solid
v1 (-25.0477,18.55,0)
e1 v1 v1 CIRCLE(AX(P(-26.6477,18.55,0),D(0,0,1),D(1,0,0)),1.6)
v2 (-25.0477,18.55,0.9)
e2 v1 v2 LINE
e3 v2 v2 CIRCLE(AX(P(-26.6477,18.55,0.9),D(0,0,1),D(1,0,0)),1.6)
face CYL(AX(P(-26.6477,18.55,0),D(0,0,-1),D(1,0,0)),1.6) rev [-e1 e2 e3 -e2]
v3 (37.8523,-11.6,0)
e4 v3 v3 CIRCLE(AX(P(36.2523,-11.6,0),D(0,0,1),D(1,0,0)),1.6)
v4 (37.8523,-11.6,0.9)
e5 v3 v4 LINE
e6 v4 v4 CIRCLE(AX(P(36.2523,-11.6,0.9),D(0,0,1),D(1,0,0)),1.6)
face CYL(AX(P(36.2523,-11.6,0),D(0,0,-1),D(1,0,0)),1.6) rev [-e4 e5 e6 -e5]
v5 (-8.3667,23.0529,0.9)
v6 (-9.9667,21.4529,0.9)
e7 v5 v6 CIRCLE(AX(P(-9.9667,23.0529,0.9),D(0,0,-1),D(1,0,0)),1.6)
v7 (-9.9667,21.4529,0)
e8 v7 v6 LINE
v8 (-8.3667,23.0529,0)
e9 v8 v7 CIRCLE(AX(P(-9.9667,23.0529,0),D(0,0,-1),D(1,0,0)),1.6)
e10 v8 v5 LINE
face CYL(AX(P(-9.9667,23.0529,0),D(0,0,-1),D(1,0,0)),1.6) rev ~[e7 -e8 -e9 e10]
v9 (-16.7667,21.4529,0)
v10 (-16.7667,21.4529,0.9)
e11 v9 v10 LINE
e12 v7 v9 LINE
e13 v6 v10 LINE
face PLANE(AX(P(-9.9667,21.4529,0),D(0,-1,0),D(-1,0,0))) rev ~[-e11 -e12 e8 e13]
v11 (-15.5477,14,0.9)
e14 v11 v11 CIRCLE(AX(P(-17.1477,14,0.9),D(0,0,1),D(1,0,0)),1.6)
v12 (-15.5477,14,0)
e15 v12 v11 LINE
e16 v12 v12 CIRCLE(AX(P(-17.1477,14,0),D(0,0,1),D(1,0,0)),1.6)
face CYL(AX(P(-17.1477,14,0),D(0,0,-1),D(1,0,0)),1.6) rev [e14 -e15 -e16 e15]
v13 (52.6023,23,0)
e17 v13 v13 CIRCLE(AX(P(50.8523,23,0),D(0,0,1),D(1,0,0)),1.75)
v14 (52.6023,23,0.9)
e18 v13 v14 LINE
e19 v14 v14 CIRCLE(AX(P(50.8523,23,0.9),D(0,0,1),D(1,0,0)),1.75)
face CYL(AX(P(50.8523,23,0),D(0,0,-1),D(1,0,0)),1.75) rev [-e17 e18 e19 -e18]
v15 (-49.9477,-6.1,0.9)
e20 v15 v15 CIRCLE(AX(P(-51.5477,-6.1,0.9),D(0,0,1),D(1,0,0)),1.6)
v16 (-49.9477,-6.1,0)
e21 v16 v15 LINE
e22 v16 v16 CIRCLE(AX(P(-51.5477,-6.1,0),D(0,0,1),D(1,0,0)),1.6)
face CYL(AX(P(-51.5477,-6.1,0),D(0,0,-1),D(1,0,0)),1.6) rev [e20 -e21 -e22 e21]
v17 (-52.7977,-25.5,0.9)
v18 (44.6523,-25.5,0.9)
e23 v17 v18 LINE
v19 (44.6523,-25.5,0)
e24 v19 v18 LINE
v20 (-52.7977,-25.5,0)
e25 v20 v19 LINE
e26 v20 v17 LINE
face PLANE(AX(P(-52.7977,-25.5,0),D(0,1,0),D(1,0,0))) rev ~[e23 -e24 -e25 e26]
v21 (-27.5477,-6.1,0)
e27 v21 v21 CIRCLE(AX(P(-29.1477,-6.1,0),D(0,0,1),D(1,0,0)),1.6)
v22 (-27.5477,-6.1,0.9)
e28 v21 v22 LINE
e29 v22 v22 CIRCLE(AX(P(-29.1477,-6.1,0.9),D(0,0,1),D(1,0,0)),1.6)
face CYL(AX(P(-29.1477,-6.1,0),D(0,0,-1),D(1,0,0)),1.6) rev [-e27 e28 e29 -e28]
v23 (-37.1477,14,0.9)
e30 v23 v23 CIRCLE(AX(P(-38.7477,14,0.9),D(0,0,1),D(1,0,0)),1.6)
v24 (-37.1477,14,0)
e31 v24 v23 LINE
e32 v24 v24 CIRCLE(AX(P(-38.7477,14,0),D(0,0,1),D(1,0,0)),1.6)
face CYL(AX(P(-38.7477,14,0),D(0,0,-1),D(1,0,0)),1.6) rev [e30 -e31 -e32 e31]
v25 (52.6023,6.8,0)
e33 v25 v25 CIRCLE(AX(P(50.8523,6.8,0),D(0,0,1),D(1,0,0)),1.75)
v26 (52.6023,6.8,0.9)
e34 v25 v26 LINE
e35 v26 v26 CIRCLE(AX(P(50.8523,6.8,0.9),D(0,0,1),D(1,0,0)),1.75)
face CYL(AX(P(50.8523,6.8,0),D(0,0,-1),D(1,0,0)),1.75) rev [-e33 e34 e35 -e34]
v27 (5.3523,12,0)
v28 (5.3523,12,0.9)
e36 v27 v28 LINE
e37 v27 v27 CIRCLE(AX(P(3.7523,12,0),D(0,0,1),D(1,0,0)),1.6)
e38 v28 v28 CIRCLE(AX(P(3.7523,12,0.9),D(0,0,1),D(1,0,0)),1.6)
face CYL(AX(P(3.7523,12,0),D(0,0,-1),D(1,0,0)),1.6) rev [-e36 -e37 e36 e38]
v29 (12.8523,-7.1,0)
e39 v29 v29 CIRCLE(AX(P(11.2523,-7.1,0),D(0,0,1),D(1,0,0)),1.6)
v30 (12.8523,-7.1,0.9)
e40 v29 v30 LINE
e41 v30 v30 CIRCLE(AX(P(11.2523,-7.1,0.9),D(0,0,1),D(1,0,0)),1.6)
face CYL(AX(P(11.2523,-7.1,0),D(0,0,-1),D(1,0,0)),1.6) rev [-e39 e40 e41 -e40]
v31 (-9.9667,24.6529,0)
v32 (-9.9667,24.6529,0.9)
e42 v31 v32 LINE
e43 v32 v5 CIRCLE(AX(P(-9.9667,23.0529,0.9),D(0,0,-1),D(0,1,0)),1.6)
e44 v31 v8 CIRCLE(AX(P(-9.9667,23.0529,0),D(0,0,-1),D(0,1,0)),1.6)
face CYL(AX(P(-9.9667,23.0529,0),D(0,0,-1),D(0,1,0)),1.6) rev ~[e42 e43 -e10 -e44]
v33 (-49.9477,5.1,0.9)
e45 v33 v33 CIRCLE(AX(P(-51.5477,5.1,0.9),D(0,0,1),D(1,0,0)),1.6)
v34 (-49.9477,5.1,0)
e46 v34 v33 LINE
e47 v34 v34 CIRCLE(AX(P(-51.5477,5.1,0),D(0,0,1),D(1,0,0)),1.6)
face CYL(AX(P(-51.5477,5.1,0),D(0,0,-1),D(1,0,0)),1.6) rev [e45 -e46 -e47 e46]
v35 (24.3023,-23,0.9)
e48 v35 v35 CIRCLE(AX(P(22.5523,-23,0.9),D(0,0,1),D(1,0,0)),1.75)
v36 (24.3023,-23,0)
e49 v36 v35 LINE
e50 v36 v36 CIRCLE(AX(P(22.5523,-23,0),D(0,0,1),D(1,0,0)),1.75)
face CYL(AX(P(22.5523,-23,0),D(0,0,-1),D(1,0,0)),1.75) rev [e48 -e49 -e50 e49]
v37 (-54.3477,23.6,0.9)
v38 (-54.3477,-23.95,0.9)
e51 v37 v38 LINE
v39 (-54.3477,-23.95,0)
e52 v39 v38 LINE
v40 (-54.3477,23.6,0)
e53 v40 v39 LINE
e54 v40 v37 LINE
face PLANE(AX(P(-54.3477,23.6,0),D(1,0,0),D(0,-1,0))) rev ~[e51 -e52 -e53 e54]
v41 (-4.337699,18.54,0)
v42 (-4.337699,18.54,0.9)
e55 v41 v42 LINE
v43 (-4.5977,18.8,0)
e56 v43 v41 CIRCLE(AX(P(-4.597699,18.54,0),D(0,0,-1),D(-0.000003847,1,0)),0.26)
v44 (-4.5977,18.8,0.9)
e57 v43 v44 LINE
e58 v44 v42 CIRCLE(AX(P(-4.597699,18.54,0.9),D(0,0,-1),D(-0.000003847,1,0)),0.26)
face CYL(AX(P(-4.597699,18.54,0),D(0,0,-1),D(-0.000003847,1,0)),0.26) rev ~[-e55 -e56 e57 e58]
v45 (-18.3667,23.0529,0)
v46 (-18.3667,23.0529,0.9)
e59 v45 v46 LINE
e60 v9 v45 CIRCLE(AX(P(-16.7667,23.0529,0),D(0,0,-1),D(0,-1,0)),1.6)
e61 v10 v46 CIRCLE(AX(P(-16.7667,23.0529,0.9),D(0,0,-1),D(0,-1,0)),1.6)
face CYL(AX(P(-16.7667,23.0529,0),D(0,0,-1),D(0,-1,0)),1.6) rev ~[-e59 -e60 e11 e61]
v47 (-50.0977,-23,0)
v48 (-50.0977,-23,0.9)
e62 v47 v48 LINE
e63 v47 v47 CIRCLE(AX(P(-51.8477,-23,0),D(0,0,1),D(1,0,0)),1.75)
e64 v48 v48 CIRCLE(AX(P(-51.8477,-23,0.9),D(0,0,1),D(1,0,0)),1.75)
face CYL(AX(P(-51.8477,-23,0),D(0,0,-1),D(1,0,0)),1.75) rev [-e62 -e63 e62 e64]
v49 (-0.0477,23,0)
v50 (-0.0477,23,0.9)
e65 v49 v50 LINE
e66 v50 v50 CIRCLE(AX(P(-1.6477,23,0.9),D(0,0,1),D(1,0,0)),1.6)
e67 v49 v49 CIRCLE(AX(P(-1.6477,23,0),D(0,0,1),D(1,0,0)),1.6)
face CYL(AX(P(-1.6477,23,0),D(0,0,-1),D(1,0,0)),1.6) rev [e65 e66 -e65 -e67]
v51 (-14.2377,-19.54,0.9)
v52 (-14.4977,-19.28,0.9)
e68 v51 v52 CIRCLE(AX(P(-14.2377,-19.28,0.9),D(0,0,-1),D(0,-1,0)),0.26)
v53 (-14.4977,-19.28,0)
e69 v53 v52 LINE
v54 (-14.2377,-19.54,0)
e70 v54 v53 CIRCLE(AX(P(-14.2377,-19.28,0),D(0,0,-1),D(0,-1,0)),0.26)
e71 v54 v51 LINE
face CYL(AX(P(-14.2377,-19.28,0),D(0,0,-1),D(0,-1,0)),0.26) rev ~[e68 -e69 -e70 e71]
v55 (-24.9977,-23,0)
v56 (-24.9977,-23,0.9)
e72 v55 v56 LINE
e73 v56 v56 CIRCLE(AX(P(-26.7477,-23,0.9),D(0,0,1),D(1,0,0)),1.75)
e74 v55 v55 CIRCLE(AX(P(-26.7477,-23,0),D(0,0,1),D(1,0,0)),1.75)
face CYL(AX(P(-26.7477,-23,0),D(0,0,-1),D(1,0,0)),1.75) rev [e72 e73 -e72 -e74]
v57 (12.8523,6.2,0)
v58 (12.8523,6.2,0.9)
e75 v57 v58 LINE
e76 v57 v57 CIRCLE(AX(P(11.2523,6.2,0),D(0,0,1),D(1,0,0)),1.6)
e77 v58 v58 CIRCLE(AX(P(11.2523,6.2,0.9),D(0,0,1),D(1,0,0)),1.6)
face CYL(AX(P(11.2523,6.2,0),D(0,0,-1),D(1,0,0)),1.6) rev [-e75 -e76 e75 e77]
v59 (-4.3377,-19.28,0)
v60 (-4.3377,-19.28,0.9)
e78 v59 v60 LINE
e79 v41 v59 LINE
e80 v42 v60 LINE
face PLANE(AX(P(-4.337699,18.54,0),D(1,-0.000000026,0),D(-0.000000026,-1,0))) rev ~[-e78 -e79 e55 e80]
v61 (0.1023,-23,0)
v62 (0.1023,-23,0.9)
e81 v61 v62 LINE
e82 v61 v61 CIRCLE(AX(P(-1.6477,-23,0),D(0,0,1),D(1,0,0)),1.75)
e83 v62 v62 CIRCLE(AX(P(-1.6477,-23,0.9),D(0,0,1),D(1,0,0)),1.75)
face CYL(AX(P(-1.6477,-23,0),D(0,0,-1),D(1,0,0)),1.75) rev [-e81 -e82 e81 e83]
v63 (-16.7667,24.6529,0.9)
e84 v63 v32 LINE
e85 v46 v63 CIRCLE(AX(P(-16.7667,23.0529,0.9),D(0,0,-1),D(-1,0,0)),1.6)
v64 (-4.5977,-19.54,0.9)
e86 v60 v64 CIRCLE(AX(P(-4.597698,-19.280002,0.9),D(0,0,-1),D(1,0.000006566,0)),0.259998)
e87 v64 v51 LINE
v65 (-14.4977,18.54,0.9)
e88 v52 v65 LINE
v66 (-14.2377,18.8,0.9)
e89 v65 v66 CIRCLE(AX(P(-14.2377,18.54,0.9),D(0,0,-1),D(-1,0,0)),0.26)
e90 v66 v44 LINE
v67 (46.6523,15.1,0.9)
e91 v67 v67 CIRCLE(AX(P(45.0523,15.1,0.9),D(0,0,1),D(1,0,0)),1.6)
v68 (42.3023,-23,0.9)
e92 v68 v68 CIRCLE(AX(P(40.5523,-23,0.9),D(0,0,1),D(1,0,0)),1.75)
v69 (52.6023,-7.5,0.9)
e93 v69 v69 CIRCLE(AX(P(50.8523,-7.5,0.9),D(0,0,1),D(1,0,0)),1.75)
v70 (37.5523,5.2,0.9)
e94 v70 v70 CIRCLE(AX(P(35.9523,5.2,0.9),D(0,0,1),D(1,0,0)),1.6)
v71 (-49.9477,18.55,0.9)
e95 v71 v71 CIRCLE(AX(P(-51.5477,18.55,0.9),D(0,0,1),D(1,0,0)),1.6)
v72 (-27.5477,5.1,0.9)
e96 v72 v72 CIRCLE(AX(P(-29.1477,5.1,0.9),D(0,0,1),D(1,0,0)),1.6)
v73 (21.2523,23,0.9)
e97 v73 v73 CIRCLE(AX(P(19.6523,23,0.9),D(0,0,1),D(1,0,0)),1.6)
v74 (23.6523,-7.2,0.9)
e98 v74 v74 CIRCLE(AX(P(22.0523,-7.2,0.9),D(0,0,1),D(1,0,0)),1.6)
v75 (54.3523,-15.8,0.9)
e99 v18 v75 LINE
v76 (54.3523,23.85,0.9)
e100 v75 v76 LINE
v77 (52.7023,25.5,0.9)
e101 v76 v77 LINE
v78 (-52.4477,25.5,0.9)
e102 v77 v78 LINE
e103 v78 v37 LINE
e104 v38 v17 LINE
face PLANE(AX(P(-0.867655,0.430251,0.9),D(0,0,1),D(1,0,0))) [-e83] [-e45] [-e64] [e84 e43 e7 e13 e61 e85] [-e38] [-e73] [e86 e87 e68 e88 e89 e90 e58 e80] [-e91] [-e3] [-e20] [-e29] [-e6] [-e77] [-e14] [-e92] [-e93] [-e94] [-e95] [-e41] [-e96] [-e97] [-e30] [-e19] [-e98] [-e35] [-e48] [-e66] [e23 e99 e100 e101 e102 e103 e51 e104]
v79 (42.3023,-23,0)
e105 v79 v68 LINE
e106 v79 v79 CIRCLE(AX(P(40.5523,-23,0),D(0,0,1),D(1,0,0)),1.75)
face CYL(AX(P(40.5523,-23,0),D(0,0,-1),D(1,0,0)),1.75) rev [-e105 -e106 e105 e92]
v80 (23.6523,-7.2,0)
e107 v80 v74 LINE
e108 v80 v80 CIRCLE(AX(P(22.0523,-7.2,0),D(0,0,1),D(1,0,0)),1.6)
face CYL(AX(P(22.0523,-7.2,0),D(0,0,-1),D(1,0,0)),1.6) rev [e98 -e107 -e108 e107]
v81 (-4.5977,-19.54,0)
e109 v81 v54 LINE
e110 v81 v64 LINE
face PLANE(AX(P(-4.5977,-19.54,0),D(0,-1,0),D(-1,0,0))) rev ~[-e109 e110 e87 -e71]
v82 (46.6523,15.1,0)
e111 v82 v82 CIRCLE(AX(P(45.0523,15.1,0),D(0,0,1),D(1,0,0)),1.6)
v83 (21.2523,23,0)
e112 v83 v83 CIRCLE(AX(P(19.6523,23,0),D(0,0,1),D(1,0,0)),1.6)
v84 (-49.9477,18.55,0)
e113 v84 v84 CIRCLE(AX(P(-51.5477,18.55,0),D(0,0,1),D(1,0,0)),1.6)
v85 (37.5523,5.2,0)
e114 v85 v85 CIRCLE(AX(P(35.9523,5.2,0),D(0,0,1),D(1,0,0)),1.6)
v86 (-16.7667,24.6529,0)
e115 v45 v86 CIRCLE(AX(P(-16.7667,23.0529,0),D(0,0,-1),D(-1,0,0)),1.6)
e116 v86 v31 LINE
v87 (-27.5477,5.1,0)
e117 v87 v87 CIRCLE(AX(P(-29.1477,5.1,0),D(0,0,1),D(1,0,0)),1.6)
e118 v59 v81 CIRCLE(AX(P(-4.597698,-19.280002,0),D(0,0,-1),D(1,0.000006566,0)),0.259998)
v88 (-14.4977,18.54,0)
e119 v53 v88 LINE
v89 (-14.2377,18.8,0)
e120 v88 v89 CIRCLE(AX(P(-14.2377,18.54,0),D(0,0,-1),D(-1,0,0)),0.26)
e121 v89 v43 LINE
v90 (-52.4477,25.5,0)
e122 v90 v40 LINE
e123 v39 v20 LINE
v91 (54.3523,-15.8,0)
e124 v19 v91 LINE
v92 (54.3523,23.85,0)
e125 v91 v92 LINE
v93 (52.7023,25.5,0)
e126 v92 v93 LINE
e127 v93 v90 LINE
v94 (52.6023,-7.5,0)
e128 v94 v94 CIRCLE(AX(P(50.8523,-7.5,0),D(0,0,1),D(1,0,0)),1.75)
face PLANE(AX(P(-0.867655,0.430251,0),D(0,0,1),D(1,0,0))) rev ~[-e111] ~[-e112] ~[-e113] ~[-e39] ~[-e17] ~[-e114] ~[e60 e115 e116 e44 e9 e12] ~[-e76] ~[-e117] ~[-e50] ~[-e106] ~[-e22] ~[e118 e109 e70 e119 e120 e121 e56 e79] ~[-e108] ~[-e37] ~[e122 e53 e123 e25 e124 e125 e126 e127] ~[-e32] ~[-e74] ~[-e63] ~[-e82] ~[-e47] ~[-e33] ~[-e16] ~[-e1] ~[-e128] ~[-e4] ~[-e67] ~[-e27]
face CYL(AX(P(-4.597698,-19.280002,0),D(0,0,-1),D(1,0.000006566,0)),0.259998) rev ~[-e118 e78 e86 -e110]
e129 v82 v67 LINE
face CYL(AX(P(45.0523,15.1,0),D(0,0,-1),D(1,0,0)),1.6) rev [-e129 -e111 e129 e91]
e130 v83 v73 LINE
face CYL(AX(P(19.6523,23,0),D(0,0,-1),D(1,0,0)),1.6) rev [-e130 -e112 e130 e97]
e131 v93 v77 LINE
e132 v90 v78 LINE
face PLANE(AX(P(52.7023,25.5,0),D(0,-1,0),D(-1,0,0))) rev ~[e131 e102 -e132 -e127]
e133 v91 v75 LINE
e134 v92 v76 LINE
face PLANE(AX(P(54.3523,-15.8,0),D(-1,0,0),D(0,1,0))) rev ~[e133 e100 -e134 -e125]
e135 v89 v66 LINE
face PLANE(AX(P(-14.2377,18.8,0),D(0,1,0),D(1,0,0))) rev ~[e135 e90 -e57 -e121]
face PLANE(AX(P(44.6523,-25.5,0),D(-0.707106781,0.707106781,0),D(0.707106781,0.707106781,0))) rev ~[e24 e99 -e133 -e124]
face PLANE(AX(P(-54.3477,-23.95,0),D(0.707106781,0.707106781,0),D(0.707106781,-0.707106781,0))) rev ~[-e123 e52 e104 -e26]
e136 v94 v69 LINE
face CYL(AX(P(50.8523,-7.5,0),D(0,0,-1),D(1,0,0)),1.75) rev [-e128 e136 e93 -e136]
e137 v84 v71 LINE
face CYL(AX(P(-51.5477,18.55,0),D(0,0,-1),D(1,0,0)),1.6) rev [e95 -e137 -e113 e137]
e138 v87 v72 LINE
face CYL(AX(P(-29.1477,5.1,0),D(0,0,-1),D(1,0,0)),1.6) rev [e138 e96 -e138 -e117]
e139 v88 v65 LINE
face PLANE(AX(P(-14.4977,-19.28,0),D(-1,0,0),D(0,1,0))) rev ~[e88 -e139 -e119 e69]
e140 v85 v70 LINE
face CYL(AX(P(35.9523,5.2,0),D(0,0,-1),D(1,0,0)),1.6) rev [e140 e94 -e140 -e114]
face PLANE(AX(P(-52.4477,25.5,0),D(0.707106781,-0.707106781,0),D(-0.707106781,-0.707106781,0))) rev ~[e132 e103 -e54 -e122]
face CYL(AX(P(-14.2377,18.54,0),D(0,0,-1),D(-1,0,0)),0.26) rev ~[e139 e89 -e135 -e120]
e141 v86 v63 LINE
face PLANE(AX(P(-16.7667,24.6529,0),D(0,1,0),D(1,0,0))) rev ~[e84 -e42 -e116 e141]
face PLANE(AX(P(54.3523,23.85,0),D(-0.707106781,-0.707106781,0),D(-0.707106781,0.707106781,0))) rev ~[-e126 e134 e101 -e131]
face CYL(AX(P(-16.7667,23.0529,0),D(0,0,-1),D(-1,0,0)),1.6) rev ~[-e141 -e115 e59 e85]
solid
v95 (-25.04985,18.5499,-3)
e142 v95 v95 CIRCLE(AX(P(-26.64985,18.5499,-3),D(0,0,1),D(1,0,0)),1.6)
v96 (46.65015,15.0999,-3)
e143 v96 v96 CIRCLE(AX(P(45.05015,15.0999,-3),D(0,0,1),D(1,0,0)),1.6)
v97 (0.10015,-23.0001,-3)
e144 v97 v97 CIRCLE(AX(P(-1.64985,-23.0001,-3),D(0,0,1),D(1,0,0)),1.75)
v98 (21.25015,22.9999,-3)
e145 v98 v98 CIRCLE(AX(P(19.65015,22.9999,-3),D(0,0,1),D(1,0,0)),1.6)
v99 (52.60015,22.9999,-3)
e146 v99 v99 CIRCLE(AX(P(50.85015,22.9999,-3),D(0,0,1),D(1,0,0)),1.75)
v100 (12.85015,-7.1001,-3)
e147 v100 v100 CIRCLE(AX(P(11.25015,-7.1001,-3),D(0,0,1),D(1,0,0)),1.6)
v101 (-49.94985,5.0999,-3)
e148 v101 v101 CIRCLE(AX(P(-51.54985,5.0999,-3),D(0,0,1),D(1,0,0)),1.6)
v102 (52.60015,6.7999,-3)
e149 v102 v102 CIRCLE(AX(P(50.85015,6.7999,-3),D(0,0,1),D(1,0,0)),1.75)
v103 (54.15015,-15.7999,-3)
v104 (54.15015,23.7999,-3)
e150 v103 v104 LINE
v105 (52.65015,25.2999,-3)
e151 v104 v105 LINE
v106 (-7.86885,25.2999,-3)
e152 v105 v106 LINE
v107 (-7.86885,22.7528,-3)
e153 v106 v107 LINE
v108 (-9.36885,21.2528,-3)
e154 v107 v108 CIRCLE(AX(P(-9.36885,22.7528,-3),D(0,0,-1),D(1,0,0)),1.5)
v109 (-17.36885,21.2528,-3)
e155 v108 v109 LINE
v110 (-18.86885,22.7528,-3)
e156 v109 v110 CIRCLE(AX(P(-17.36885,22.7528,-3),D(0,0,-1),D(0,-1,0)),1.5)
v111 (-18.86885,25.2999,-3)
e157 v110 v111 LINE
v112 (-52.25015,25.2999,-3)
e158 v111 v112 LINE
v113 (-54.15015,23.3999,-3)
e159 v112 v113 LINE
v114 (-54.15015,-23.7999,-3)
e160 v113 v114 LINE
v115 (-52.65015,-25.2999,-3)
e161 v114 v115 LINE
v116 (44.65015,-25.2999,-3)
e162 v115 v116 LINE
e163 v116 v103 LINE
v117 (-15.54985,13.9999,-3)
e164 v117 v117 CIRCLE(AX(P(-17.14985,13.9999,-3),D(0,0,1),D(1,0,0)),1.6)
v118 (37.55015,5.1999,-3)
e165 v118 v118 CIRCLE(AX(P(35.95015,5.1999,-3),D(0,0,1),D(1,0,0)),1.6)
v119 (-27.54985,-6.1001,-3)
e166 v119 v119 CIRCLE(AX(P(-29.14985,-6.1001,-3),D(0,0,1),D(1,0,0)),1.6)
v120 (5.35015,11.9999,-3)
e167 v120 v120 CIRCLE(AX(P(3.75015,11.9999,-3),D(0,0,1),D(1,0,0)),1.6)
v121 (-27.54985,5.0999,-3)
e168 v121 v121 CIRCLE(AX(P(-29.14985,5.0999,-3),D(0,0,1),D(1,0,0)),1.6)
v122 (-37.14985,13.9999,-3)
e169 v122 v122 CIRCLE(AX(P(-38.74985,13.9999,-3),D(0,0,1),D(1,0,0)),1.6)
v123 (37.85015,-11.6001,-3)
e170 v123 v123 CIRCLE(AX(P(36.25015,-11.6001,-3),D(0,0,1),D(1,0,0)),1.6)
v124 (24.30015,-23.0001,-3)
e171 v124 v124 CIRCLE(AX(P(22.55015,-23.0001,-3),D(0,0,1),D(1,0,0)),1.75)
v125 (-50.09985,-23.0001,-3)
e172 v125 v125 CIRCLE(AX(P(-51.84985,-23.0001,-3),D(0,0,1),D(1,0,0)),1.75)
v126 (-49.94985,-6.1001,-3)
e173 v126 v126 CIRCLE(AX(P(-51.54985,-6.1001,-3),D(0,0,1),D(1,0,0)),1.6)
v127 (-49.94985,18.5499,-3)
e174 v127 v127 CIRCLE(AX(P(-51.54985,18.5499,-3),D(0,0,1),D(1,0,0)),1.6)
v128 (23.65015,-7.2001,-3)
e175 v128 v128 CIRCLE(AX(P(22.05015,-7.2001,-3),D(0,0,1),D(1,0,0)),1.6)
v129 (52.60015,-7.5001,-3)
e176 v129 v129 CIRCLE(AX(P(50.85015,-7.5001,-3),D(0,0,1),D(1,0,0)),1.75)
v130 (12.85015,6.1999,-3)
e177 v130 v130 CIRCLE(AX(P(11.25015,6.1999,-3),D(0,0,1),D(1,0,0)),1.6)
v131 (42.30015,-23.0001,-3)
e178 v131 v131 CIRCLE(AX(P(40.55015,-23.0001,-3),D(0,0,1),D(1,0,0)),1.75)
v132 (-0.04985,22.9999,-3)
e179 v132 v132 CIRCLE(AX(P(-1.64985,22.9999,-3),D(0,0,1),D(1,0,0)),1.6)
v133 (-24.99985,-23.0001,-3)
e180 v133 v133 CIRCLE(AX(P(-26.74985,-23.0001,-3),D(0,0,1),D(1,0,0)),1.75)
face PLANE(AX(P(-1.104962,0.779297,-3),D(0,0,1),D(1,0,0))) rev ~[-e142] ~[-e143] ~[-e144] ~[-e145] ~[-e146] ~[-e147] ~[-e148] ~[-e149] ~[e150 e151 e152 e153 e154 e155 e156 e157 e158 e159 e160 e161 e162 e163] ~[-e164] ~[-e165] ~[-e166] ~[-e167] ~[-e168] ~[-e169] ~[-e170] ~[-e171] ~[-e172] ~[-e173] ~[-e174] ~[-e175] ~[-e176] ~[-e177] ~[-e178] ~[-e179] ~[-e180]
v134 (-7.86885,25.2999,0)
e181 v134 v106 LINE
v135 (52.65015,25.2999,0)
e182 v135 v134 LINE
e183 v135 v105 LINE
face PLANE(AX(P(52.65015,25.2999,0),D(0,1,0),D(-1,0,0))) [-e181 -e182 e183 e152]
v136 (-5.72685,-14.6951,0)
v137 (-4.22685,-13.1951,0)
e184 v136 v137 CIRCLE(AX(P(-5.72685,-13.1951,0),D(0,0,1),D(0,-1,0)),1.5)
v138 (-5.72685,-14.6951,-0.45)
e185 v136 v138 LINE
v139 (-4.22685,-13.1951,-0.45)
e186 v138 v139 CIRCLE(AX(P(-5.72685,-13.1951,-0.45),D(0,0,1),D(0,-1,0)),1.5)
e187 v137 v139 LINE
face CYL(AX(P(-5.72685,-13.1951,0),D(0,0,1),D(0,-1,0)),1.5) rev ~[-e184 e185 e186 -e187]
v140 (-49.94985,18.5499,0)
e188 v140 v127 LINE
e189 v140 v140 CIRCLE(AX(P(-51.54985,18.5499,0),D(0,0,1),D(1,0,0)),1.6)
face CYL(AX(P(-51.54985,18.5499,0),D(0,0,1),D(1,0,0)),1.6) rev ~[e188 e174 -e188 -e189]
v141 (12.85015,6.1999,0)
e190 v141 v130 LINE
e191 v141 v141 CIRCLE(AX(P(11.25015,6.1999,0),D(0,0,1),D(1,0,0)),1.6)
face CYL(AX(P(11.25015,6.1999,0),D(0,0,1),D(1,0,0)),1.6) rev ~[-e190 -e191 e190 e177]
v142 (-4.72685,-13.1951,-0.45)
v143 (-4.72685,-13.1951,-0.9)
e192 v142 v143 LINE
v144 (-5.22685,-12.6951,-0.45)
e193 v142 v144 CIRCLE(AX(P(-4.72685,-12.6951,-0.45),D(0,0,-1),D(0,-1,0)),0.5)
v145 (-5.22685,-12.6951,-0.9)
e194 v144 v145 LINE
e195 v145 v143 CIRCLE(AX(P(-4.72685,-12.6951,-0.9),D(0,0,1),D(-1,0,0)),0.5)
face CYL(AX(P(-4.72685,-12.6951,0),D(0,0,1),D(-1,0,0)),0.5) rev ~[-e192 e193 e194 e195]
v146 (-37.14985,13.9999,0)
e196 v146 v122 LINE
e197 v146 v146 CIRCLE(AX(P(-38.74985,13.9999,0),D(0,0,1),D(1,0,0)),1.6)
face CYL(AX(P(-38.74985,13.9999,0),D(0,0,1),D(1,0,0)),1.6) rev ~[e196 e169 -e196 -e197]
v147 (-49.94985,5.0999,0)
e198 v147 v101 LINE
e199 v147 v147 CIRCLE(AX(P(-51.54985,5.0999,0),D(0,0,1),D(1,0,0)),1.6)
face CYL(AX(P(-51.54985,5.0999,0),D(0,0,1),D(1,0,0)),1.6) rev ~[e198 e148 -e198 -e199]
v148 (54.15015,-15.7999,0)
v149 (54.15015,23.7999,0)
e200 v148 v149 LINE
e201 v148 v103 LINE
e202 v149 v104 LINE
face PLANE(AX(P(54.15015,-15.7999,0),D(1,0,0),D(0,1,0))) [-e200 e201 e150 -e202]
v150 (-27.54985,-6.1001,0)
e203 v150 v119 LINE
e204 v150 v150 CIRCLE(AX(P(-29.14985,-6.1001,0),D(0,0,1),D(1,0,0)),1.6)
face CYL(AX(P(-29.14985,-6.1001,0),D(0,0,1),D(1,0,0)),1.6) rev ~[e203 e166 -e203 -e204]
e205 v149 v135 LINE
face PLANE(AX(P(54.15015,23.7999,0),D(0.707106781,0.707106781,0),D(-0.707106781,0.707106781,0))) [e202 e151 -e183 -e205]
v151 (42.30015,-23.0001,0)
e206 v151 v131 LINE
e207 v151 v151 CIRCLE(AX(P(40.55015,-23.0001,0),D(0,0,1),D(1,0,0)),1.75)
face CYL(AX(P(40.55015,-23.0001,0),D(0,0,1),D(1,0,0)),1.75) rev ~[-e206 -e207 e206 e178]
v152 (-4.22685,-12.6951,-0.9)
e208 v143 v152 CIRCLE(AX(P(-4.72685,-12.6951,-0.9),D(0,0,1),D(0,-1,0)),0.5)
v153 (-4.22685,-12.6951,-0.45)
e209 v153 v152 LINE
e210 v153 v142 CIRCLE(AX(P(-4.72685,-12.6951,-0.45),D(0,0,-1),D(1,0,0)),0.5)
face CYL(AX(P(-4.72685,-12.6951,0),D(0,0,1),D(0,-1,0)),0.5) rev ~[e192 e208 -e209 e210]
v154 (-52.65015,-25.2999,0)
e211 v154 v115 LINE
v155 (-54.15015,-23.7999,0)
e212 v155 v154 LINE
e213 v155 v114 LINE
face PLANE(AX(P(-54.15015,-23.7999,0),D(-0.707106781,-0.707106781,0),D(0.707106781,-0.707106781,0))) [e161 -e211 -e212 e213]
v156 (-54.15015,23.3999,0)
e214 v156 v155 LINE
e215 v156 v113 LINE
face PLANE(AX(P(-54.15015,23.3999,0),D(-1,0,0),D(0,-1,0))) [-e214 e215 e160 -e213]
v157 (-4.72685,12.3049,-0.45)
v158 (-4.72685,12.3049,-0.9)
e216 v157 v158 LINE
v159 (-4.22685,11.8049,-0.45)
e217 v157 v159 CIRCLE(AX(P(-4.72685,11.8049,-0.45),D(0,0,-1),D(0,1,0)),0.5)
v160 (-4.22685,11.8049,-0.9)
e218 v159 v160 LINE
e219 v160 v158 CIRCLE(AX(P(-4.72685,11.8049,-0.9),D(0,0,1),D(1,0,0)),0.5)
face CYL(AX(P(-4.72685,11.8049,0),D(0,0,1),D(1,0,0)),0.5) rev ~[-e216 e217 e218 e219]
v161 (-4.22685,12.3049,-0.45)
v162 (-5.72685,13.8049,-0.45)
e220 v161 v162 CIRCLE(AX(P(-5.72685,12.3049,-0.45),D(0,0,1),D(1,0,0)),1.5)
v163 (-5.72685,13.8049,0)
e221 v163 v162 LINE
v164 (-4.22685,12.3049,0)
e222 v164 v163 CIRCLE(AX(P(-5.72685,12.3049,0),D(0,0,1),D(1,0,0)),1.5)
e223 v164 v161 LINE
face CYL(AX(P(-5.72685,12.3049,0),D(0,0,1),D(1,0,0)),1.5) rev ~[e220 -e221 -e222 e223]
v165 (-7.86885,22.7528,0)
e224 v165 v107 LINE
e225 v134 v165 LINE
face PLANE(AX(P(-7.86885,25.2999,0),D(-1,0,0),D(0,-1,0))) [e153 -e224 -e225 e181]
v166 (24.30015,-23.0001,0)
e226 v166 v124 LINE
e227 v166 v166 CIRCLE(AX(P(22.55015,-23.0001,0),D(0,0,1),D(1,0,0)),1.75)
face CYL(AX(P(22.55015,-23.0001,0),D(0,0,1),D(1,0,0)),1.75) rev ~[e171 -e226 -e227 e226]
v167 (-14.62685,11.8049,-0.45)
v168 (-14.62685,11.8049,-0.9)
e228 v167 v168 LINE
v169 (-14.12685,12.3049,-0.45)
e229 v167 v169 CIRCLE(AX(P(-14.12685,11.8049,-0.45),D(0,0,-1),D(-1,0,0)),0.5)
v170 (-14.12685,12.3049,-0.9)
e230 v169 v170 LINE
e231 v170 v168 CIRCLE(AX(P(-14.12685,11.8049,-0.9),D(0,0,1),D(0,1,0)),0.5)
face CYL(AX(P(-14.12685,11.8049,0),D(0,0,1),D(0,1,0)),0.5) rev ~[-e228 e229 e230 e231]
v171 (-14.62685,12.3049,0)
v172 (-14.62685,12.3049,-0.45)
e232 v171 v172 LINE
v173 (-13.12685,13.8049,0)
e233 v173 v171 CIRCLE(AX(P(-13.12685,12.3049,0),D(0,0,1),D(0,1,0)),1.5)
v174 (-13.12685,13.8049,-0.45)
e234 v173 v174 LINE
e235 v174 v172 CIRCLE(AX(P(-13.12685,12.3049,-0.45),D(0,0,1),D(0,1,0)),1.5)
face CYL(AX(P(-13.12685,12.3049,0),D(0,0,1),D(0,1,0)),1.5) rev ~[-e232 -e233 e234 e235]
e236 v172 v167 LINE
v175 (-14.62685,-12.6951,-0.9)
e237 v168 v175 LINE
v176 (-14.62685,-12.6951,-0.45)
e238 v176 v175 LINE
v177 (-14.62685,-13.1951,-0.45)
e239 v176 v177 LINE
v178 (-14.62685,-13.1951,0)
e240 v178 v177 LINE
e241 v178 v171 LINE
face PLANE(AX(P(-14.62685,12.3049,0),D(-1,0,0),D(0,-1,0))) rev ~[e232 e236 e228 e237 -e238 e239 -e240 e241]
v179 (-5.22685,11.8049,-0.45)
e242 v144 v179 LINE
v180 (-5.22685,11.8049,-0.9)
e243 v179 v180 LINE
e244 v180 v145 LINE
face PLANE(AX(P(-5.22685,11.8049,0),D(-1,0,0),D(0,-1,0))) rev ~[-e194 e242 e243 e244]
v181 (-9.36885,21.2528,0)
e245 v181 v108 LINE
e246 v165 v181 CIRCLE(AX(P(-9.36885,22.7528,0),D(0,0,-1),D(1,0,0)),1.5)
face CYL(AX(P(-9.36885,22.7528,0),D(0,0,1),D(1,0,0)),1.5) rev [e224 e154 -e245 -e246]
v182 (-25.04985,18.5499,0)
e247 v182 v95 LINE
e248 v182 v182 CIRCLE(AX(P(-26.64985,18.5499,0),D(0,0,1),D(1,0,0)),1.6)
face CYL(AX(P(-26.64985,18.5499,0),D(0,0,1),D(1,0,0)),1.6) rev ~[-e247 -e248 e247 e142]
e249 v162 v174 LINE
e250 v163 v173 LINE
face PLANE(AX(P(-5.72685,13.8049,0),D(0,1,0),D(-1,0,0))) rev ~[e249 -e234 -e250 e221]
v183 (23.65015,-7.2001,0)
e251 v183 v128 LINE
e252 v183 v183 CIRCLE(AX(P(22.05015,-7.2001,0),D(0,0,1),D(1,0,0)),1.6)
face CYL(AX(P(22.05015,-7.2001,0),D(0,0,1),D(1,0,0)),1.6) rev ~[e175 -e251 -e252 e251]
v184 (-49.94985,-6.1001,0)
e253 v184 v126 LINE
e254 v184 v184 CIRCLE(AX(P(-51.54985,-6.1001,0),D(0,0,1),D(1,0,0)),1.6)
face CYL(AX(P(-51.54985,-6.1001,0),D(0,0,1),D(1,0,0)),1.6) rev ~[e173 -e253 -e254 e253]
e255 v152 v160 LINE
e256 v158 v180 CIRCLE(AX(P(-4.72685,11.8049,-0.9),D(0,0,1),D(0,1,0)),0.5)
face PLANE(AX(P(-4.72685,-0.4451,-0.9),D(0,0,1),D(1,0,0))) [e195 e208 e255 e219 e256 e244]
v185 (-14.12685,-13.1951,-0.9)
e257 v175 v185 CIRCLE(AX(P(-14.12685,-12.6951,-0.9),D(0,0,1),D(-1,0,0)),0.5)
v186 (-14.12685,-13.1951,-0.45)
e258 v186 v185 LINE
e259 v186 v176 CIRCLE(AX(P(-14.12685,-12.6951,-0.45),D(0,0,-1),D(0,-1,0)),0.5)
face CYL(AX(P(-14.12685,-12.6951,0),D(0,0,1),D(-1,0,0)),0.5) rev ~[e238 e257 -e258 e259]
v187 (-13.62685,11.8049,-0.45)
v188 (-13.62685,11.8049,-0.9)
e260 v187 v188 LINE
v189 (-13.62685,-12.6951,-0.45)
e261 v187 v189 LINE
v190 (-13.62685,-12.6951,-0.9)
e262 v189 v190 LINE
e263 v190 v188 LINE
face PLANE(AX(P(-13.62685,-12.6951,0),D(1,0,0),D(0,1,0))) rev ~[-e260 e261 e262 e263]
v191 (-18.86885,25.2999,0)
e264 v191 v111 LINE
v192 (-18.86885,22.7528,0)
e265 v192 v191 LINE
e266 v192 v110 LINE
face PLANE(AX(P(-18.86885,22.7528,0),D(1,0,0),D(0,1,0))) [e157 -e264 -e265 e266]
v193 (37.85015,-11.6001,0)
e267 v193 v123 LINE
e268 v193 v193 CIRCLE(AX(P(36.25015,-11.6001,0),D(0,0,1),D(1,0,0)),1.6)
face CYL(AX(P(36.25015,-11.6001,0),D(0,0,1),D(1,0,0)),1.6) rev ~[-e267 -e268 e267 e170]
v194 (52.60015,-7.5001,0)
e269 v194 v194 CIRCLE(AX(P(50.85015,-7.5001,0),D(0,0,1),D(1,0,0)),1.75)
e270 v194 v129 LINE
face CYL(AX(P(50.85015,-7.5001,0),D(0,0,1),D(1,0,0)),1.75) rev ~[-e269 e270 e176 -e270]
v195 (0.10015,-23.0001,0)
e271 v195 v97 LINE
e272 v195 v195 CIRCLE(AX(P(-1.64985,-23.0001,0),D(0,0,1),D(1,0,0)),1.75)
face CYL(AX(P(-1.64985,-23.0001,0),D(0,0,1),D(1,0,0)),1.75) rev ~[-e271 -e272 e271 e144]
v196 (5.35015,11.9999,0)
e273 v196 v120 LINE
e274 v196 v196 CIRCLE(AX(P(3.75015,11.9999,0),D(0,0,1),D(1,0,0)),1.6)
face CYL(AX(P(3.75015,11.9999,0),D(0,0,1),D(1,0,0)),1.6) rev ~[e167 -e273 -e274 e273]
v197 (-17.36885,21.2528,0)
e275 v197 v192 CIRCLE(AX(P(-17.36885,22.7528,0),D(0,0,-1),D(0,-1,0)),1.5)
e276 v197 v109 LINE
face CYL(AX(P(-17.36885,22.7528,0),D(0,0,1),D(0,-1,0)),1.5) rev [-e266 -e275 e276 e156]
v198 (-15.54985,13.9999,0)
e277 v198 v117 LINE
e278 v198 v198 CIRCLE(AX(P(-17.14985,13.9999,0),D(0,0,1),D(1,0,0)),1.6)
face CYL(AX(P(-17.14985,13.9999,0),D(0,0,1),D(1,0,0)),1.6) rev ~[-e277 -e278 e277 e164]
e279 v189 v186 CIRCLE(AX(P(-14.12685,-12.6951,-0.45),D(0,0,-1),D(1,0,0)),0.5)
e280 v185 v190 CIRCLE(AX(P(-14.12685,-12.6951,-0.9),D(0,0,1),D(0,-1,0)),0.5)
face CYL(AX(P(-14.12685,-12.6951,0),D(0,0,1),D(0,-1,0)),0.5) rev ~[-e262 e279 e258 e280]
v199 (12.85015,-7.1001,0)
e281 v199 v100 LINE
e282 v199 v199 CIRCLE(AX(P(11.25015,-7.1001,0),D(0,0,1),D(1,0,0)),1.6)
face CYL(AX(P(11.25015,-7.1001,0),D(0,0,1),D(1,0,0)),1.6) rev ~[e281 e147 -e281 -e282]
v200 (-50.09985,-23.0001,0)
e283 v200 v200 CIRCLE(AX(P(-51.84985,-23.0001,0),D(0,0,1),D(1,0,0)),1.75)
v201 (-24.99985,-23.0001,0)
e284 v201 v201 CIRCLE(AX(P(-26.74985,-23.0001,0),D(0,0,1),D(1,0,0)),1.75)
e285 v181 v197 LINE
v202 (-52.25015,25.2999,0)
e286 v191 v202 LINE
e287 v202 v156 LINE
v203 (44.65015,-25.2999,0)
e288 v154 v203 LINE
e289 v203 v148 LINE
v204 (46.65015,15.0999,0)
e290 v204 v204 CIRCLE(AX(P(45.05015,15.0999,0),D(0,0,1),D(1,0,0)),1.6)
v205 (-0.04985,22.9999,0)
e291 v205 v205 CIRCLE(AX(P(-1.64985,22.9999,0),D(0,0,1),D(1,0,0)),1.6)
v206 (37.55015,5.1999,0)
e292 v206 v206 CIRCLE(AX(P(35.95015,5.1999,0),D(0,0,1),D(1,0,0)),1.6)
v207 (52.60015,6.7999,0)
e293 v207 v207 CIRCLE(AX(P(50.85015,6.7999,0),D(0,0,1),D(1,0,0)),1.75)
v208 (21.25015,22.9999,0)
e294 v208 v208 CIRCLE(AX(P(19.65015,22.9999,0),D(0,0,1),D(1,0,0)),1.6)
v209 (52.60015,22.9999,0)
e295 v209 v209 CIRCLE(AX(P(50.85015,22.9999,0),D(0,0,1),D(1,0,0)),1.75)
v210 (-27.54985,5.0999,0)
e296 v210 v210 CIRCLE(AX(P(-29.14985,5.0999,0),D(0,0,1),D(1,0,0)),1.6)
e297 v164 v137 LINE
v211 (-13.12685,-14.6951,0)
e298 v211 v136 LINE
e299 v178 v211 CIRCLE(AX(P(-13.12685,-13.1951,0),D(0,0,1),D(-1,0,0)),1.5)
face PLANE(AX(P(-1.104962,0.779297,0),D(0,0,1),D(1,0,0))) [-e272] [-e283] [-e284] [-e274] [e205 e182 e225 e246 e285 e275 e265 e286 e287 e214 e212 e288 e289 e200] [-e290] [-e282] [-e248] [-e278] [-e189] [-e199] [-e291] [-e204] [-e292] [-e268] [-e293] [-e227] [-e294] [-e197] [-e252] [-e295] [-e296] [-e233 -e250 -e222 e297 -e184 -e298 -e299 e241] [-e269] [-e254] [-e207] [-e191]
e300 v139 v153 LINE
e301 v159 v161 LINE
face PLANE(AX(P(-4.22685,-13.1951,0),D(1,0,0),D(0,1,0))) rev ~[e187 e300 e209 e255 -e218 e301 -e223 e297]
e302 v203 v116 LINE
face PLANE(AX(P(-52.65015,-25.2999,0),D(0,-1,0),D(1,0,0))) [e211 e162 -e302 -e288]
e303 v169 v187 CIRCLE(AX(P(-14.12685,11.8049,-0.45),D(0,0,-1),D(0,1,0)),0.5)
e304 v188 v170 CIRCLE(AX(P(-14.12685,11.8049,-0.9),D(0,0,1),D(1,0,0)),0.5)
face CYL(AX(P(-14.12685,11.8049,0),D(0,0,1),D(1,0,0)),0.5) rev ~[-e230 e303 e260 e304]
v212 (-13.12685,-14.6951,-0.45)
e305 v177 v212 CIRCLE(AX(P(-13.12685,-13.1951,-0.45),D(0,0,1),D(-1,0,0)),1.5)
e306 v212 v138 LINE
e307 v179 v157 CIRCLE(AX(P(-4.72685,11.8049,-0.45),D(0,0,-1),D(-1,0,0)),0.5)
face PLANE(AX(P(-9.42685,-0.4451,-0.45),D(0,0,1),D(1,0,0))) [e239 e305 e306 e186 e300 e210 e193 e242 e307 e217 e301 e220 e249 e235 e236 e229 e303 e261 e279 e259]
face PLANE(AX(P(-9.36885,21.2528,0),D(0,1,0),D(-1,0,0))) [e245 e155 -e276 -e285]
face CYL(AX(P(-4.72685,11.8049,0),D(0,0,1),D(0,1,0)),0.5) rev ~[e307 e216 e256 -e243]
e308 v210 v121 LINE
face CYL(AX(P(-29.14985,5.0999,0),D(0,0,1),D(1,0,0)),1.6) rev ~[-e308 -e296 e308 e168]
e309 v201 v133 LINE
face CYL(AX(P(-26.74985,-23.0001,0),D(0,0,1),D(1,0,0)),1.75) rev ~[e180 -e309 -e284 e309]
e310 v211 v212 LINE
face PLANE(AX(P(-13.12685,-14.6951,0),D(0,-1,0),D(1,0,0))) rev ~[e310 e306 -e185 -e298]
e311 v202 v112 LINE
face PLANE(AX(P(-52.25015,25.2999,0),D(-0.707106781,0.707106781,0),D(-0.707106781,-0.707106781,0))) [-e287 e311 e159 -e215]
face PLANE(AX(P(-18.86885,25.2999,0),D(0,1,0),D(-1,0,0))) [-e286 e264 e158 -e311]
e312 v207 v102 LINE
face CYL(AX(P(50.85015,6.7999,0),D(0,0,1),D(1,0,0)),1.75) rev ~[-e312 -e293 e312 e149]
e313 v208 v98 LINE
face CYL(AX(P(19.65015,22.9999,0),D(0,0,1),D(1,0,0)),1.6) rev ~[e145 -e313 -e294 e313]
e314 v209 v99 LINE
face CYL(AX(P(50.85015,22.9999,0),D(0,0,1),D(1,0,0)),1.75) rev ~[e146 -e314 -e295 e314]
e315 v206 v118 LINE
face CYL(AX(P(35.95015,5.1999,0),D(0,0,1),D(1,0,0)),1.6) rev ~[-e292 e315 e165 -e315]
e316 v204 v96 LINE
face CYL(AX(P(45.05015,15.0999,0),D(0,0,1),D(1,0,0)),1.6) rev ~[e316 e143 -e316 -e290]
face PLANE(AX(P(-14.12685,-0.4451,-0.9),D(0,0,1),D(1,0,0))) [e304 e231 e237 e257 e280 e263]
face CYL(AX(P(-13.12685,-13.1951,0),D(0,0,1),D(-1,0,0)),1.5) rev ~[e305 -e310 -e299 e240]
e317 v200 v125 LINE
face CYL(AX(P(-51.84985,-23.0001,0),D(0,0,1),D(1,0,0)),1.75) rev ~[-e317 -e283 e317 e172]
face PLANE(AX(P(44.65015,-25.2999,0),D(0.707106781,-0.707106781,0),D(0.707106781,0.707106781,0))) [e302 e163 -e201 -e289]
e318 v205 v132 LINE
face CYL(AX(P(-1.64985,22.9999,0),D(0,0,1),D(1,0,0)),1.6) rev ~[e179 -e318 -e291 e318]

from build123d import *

# Parameters (mm, degrees)
F0_R     = 1.75
F0_R_2   = 1.6
F0_W     = 33.35
F0_H     = 3.8
F1_DEPTH = 0.9
F2_R     = 1.75
F2_R_2   = 1.6
F3_DEPTH = 3
F4_DEPTH = 0.45
F5_DEPTH = 0.9


# Not quite as in the source:
# - after a boolean that leaves OpenCascade's solid faulty, fix() repairs it
# - ends of sketch curves that miss each other by under 0.0002 mm in the source are joined


with BuildPart() as f1:
    # F0 (on Top) → F1 (new body)
    with BuildSketch(Plane.XY):
        Polygon((-54.3477, 23.6), (-54.3477, -23.95), (-52.7977, -25.5), (44.6523, -25.5), (54.3523, -15.8), (54.3523, 23.85), (52.7023, 25.5), (-52.4477, 25.5), align=None)
        with Locations((-51.8477, -23)):
            Circle(F0_R, mode=Mode.SUBTRACT)
        with Locations((-26.7477, -23)):
            Circle(F0_R, mode=Mode.SUBTRACT)
        with Locations((-1.6477, -23)):
            Circle(F0_R, mode=Mode.SUBTRACT)
        with Locations((-51.5477, -6.1)):
            Circle(F0_R_2, mode=Mode.SUBTRACT)
        with Locations((-29.1477, -6.1)):
            Circle(F0_R_2, mode=Mode.SUBTRACT)
        with BuildLine():
            Line((-14.4977, -19.28), (-14.4977, 18.54))
            ThreePointArc((-14.4977, 18.54), (-14.4215477631, 18.7238477631), (-14.2377, 18.8))
            Line((-14.2377, 18.8), (-4.5977, 18.8))
            ThreePointArc((-4.5977, 18.8), (-4.4138515904, 18.7238481167), (-4.337699, 18.54))
            Line((-4.337699, 18.54), (-4.3377, -19.28))
            ThreePointArc((-4.3377, -19.28), (-4.4138515904, -19.4638481167), (-4.5977, -19.54))
            Line((-4.5977, -19.54), (-14.2377, -19.54))
            ThreePointArc((-14.2377, -19.54), (-14.4215477631, -19.4638477631), (-14.4977, -19.28))
        make_face(mode=Mode.SUBTRACT)
        with Locations((22.5523, -23)):
            Circle(F0_R, mode=Mode.SUBTRACT)
        with Locations((40.5523, -23)):
            Circle(F0_R, mode=Mode.SUBTRACT)
        with Locations((11.2523, -7.1)):
            Circle(F0_R_2, mode=Mode.SUBTRACT)
        with Locations((22.0523, -7.2)):
            Circle(F0_R_2, mode=Mode.SUBTRACT)
        with Locations((36.2523, -11.6)):
            Circle(F0_R_2, mode=Mode.SUBTRACT)
        with Locations((50.8523, -7.5)):
            Circle(F0_R, mode=Mode.SUBTRACT)
        with Locations((-51.5477, 5.1)):
            Circle(F0_R_2, mode=Mode.SUBTRACT)
        with Locations((-29.1477, 5.1)):
            Circle(F0_R_2, mode=Mode.SUBTRACT)
        with Locations((-51.5477, 18.55)):
            Circle(F0_R_2, mode=Mode.SUBTRACT)
        with Locations((-38.7477, 14)):
            Circle(F0_R_2, mode=Mode.SUBTRACT)
        with Locations((-36.035871, 22.938344)):
            Rectangle(F0_W, F0_H, mode=Mode.SUBTRACT)
        with Locations((-17.1477, 14)):
            Circle(F0_R_2, mode=Mode.SUBTRACT)
        with Locations((-26.6477, 18.55)):
            Circle(F0_R_2, mode=Mode.SUBTRACT)
        with BuildLine():
            ThreePointArc((-16.7667, 21.4529), (-17.8980708499, 21.9215291501), (-18.3667, 23.0529))
            ThreePointArc((-18.3667, 23.0529), (-17.8980708499, 24.1842708499), (-16.7667, 24.6529))
            Line((-16.7667, 24.6529), (-9.9667, 24.6529))
            ThreePointArc((-9.9667, 24.6529), (-8.8353291501, 24.1842708499), (-8.3667, 23.0529))
            ThreePointArc((-8.3667, 23.0529), (-8.8353291501, 21.9215291501), (-9.9667, 21.4529))
            Line((-9.9667, 21.4529), (-16.7667, 21.4529))
        make_face(mode=Mode.SUBTRACT)
        with Locations((-1.6477, 23)):
            Circle(F0_R_2, mode=Mode.SUBTRACT)
        with Locations((11.2523, 6.2)):
            Circle(F0_R_2, mode=Mode.SUBTRACT)
        with Locations((3.7523, 12)):
            Circle(F0_R_2, mode=Mode.SUBTRACT)
        with Locations((35.9523, 5.2)):
            Circle(F0_R_2, mode=Mode.SUBTRACT)
        with Locations((50.8523, 6.8)):
            Circle(F0_R, mode=Mode.SUBTRACT)
        with Locations((19.6523, 23)):
            Circle(F0_R_2, mode=Mode.SUBTRACT)
        with Locations((45.0523, 15.1)):
            Circle(F0_R_2, mode=Mode.SUBTRACT)
        with Locations((50.8523, 23)):
            Circle(F0_R, mode=Mode.SUBTRACT)
        with Locations((-36.035871, 22.938344)):
            Rectangle(F0_W, F0_H)
    extrude(amount=F1_DEPTH)


with BuildPart() as f3:
    # F2 (on Top) → F3 (new body)
    with BuildSketch(Plane.XY):
        with BuildLine():
            ThreePointArc((-17.36885, 21.2528), (-18.4295101718, 21.6921398282), (-18.86885, 22.7528))
            Line((-18.86885, 22.7528), (-18.86885, 25.2999))
            Line((-18.86885, 25.2999), (-52.25015, 25.2999))
            Line((-52.25015, 25.2999), (-54.15015, 23.3999))
            Line((-54.15015, 23.3999), (-54.15015, -23.7999))
            Line((-54.15015, -23.7999), (-52.65015, -25.2999))
            Line((-52.65015, -25.2999), (44.65015, -25.2999))
            Line((44.65015, -25.2999), (54.15015, -15.7999))
            Line((54.15015, -15.7999), (54.15015, 23.7999))
            Line((54.15015, 23.7999), (52.65015, 25.2999))
            Line((52.65015, 25.2999), (-7.86885, 25.2999))
            Line((-7.86885, 25.2999), (-7.86885, 22.7528))
            ThreePointArc((-7.86885, 22.7528), (-8.3081898282, 21.6921398282), (-9.36885, 21.2528))
            Line((-9.36885, 21.2528), (-17.36885, 21.2528))
        make_face()
        with Locations((-51.84985, -23.0001)):
            Circle(F2_R, mode=Mode.SUBTRACT)
        with Locations((-26.74985, -23.0001)):
            Circle(F2_R, mode=Mode.SUBTRACT)
        with Locations((-1.64985, -23.0001)):
            Circle(F2_R, mode=Mode.SUBTRACT)
        with Locations((-51.54985, -6.1001)):
            Circle(F2_R_2, mode=Mode.SUBTRACT)
        with Locations((-29.14985, -6.1001)):
            Circle(F2_R_2, mode=Mode.SUBTRACT)
        with BuildLine():
            Line((-14.62685, 11.8049), (-14.62685, 12.3049))
            ThreePointArc((-14.62685, 12.3049), (-14.1875101718, 13.3655601718), (-13.12685, 13.8049))
            Line((-13.12685, 13.8049), (-5.72685, 13.8049))
            ThreePointArc((-5.72685, 13.8049), (-4.6661898282, 13.3655601718), (-4.22685, 12.3049))
            Line((-4.22685, 12.3049), (-4.22685, 11.8049))
            Line((-4.22685, 11.8049), (-4.22685, -12.6951))
            Line((-4.22685, -12.6951), (-4.22685, -13.1951))
            ThreePointArc((-4.22685, -13.1951), (-4.6661898282, -14.2557601718), (-5.72685, -14.6951))
            Line((-5.72685, -14.6951), (-13.12685, -14.6951))
            ThreePointArc((-13.12685, -14.6951), (-14.1875101718, -14.2557601718), (-14.62685, -13.1951))
            Line((-14.62685, -13.1951), (-14.62685, -12.6951))
            Line((-14.62685, -12.6951), (-14.62685, 11.8049))
        make_face(mode=Mode.SUBTRACT)
        with Locations((22.55015, -23.0001)):
            Circle(F2_R, mode=Mode.SUBTRACT)
        with Locations((40.55015, -23.0001)):
            Circle(F2_R, mode=Mode.SUBTRACT)
        with Locations((11.25015, -7.1001)):
            Circle(F2_R_2, mode=Mode.SUBTRACT)
        with Locations((22.05015, -7.2001)):
            Circle(F2_R_2, mode=Mode.SUBTRACT)
        with Locations((36.25015, -11.6001)):
            Circle(F2_R_2, mode=Mode.SUBTRACT)
        with Locations((50.85015, -7.5001)):
            Circle(F2_R, mode=Mode.SUBTRACT)
        with Locations((-51.54985, 5.0999)):
            Circle(F2_R_2, mode=Mode.SUBTRACT)
        with Locations((-29.14985, 5.0999)):
            Circle(F2_R_2, mode=Mode.SUBTRACT)
        with Locations((-51.54985, 18.5499)):
            Circle(F2_R_2, mode=Mode.SUBTRACT)
        with Locations((-38.74985, 13.9999)):
            Circle(F2_R_2, mode=Mode.SUBTRACT)
        with Locations((-17.14985, 13.9999)):
            Circle(F2_R_2, mode=Mode.SUBTRACT)
        with Locations((-26.64985, 18.5499)):
            Circle(F2_R_2, mode=Mode.SUBTRACT)
        with Locations((-1.64985, 22.9999)):
            Circle(F2_R_2, mode=Mode.SUBTRACT)
        with Locations((11.25015, 6.1999)):
            Circle(F2_R_2, mode=Mode.SUBTRACT)
        with Locations((3.75015, 11.9999)):
            Circle(F2_R_2, mode=Mode.SUBTRACT)
        with Locations((35.95015, 5.1999)):
            Circle(F2_R_2, mode=Mode.SUBTRACT)
        with Locations((50.85015, 6.7999)):
            Circle(F2_R, mode=Mode.SUBTRACT)
        with Locations((19.65015, 22.9999)):
            Circle(F2_R_2, mode=Mode.SUBTRACT)
        with Locations((45.05015, 15.0999)):
            Circle(F2_R_2, mode=Mode.SUBTRACT)
        with Locations((50.85015, 22.9999)):
            Circle(F2_R, mode=Mode.SUBTRACT)
        with BuildLine():
            ThreePointArc((-13.12685, 13.8049), (-14.1875101718, 13.3655601718), (-14.62685, 12.3049))
            Line((-14.62685, 12.3049), (-14.62685, 11.8049))
            ThreePointArc((-14.62685, 11.8049), (-14.4804033906, 12.1584533906), (-14.12685, 12.3049))
            ThreePointArc((-14.12685, 12.3049), (-13.7732966094, 12.1584533906), (-13.62685, 11.8049))
            Line((-13.62685, 11.8049), (-13.62685, -12.6951))
            ThreePointArc((-13.62685, -12.6951), (-13.7732966094, -13.0486533906), (-14.12685, -13.1951))
            ThreePointArc((-14.12685, -13.1951), (-14.4804033906, -13.0486533906), (-14.62685, -12.6951))
            Line((-14.62685, -12.6951), (-14.62685, -13.1951))
            ThreePointArc((-14.62685, -13.1951), (-14.1875101718, -14.2557601718), (-13.12685, -14.6951))
            Line((-13.12685, -14.6951), (-5.72685, -14.6951))
            ThreePointArc((-5.72685, -14.6951), (-4.6661898282, -14.2557601718), (-4.22685, -13.1951))
            Line((-4.22685, -13.1951), (-4.22685, -12.6951))
            ThreePointArc((-4.22685, -12.6951), (-4.3732966094, -13.0486533906), (-4.72685, -13.1951))
            ThreePointArc((-4.72685, -13.1951), (-5.0804033906, -13.0486533906), (-5.22685, -12.6951))
            Line((-5.22685, -12.6951), (-5.22685, 11.8049))
            ThreePointArc((-5.22685, 11.8049), (-5.0804033906, 12.1584533906), (-4.72685, 12.3049))
            ThreePointArc((-4.72685, 12.3049), (-4.3732966094, 12.1584533906), (-4.22685, 11.8049))
            Line((-4.22685, 11.8049), (-4.22685, 12.3049))
            ThreePointArc((-4.22685, 12.3049), (-4.6661898282, 13.3655601718), (-5.72685, 13.8049))
            Line((-5.72685, 13.8049), (-13.12685, 13.8049))
        make_face()
        with BuildLine():
            ThreePointArc((-14.12685, 12.3049), (-14.4804033906, 12.1584533906), (-14.62685, 11.8049))
            Line((-14.62685, 11.8049), (-14.62685, -12.6951))
            ThreePointArc((-14.62685, -12.6951), (-14.4804033906, -13.0486533906), (-14.12685, -13.1951))
            ThreePointArc((-14.12685, -13.1951), (-13.7732966094, -13.0486533906), (-13.62685, -12.6951))
            Line((-13.62685, -12.6951), (-13.62685, 11.8049))
            ThreePointArc((-13.62685, 11.8049), (-13.7732966094, 12.1584533906), (-14.12685, 12.3049))
        make_face()
        with BuildLine():
            Line((-4.22685, -12.6951), (-4.22685, 11.8049))
            ThreePointArc((-4.22685, 11.8049), (-4.3732966094, 12.1584533906), (-4.72685, 12.3049))
            ThreePointArc((-4.72685, 12.3049), (-5.0804033906, 12.1584533906), (-5.22685, 11.8049))
            Line((-5.22685, 11.8049), (-5.22685, -12.6951))
            ThreePointArc((-5.22685, -12.6951), (-5.0804033906, -13.0486533906), (-4.72685, -13.1951))
            ThreePointArc((-4.72685, -13.1951), (-4.3732966094, -13.0486533906), (-4.22685, -12.6951))
        make_face()
    extrude(amount=-F3_DEPTH)

    # F2 (on Top) → F4 (cut)
    with BuildSketch(Plane.XY):
        with BuildLine():
            ThreePointArc((-13.12685, 13.8049), (-14.1875101718, 13.3655601718), (-14.62685, 12.3049))
            Line((-14.62685, 12.3049), (-14.62685, 11.8049))
            ThreePointArc((-14.62685, 11.8049), (-14.4804033906, 12.1584533906), (-14.12685, 12.3049))
            ThreePointArc((-14.12685, 12.3049), (-13.7732966094, 12.1584533906), (-13.62685, 11.8049))
            Line((-13.62685, 11.8049), (-13.62685, -12.6951))
            ThreePointArc((-13.62685, -12.6951), (-13.7732966094, -13.0486533906), (-14.12685, -13.1951))
            ThreePointArc((-14.12685, -13.1951), (-14.4804033906, -13.0486533906), (-14.62685, -12.6951))
            Line((-14.62685, -12.6951), (-14.62685, -13.1951))
            ThreePointArc((-14.62685, -13.1951), (-14.1875101718, -14.2557601718), (-13.12685, -14.6951))
            Line((-13.12685, -14.6951), (-5.72685, -14.6951))
            ThreePointArc((-5.72685, -14.6951), (-4.6661898282, -14.2557601718), (-4.22685, -13.1951))
            Line((-4.22685, -13.1951), (-4.22685, -12.6951))
            ThreePointArc((-4.22685, -12.6951), (-4.3732966094, -13.0486533906), (-4.72685, -13.1951))
            ThreePointArc((-4.72685, -13.1951), (-5.0804033906, -13.0486533906), (-5.22685, -12.6951))
            Line((-5.22685, -12.6951), (-5.22685, 11.8049))
            ThreePointArc((-5.22685, 11.8049), (-5.0804033906, 12.1584533906), (-4.72685, 12.3049))
            ThreePointArc((-4.72685, 12.3049), (-4.3732966094, 12.1584533906), (-4.22685, 11.8049))
            Line((-4.22685, 11.8049), (-4.22685, 12.3049))
            ThreePointArc((-4.22685, 12.3049), (-4.6661898282, 13.3655601718), (-5.72685, 13.8049))
            Line((-5.72685, 13.8049), (-13.12685, 13.8049))
        make_face()
    extrude(amount=-F4_DEPTH, mode=Mode.SUBTRACT)

    # F2 (on Top) → F5 (cut)
    with BuildSketch(Plane.XY):
        with BuildLine():
            ThreePointArc((-14.12685, 12.3049), (-14.4804033906, 12.1584533906), (-14.62685, 11.8049))
            Line((-14.62685, 11.8049), (-14.62685, -12.6951))
            ThreePointArc((-14.62685, -12.6951), (-14.4804033906, -13.0486533906), (-14.12685, -13.1951))
            ThreePointArc((-14.12685, -13.1951), (-13.7732966094, -13.0486533906), (-13.62685, -12.6951))
            Line((-13.62685, -12.6951), (-13.62685, 11.8049))
            ThreePointArc((-13.62685, 11.8049), (-13.7732966094, 12.1584533906), (-14.12685, 12.3049))
        make_face()
        with BuildLine():
            Line((-4.22685, -12.6951), (-4.22685, 11.8049))
            ThreePointArc((-4.22685, 11.8049), (-4.3732966094, 12.1584533906), (-4.72685, 12.3049))
            ThreePointArc((-4.72685, 12.3049), (-5.0804033906, 12.1584533906), (-5.22685, 11.8049))
            Line((-5.22685, 11.8049), (-5.22685, -12.6951))
            ThreePointArc((-5.22685, -12.6951), (-5.0804033906, -13.0486533906), (-4.72685, -13.1951))
            ThreePointArc((-4.72685, -13.1951), (-4.3732966094, -13.0486533906), (-4.22685, -12.6951))
        make_face()
    extrude(amount=-F5_DEPTH, mode=Mode.SUBTRACT)

    add(f3.part.fix(), mode=Mode.REPLACE)


solid = Compound([f1.part, f3.part])
